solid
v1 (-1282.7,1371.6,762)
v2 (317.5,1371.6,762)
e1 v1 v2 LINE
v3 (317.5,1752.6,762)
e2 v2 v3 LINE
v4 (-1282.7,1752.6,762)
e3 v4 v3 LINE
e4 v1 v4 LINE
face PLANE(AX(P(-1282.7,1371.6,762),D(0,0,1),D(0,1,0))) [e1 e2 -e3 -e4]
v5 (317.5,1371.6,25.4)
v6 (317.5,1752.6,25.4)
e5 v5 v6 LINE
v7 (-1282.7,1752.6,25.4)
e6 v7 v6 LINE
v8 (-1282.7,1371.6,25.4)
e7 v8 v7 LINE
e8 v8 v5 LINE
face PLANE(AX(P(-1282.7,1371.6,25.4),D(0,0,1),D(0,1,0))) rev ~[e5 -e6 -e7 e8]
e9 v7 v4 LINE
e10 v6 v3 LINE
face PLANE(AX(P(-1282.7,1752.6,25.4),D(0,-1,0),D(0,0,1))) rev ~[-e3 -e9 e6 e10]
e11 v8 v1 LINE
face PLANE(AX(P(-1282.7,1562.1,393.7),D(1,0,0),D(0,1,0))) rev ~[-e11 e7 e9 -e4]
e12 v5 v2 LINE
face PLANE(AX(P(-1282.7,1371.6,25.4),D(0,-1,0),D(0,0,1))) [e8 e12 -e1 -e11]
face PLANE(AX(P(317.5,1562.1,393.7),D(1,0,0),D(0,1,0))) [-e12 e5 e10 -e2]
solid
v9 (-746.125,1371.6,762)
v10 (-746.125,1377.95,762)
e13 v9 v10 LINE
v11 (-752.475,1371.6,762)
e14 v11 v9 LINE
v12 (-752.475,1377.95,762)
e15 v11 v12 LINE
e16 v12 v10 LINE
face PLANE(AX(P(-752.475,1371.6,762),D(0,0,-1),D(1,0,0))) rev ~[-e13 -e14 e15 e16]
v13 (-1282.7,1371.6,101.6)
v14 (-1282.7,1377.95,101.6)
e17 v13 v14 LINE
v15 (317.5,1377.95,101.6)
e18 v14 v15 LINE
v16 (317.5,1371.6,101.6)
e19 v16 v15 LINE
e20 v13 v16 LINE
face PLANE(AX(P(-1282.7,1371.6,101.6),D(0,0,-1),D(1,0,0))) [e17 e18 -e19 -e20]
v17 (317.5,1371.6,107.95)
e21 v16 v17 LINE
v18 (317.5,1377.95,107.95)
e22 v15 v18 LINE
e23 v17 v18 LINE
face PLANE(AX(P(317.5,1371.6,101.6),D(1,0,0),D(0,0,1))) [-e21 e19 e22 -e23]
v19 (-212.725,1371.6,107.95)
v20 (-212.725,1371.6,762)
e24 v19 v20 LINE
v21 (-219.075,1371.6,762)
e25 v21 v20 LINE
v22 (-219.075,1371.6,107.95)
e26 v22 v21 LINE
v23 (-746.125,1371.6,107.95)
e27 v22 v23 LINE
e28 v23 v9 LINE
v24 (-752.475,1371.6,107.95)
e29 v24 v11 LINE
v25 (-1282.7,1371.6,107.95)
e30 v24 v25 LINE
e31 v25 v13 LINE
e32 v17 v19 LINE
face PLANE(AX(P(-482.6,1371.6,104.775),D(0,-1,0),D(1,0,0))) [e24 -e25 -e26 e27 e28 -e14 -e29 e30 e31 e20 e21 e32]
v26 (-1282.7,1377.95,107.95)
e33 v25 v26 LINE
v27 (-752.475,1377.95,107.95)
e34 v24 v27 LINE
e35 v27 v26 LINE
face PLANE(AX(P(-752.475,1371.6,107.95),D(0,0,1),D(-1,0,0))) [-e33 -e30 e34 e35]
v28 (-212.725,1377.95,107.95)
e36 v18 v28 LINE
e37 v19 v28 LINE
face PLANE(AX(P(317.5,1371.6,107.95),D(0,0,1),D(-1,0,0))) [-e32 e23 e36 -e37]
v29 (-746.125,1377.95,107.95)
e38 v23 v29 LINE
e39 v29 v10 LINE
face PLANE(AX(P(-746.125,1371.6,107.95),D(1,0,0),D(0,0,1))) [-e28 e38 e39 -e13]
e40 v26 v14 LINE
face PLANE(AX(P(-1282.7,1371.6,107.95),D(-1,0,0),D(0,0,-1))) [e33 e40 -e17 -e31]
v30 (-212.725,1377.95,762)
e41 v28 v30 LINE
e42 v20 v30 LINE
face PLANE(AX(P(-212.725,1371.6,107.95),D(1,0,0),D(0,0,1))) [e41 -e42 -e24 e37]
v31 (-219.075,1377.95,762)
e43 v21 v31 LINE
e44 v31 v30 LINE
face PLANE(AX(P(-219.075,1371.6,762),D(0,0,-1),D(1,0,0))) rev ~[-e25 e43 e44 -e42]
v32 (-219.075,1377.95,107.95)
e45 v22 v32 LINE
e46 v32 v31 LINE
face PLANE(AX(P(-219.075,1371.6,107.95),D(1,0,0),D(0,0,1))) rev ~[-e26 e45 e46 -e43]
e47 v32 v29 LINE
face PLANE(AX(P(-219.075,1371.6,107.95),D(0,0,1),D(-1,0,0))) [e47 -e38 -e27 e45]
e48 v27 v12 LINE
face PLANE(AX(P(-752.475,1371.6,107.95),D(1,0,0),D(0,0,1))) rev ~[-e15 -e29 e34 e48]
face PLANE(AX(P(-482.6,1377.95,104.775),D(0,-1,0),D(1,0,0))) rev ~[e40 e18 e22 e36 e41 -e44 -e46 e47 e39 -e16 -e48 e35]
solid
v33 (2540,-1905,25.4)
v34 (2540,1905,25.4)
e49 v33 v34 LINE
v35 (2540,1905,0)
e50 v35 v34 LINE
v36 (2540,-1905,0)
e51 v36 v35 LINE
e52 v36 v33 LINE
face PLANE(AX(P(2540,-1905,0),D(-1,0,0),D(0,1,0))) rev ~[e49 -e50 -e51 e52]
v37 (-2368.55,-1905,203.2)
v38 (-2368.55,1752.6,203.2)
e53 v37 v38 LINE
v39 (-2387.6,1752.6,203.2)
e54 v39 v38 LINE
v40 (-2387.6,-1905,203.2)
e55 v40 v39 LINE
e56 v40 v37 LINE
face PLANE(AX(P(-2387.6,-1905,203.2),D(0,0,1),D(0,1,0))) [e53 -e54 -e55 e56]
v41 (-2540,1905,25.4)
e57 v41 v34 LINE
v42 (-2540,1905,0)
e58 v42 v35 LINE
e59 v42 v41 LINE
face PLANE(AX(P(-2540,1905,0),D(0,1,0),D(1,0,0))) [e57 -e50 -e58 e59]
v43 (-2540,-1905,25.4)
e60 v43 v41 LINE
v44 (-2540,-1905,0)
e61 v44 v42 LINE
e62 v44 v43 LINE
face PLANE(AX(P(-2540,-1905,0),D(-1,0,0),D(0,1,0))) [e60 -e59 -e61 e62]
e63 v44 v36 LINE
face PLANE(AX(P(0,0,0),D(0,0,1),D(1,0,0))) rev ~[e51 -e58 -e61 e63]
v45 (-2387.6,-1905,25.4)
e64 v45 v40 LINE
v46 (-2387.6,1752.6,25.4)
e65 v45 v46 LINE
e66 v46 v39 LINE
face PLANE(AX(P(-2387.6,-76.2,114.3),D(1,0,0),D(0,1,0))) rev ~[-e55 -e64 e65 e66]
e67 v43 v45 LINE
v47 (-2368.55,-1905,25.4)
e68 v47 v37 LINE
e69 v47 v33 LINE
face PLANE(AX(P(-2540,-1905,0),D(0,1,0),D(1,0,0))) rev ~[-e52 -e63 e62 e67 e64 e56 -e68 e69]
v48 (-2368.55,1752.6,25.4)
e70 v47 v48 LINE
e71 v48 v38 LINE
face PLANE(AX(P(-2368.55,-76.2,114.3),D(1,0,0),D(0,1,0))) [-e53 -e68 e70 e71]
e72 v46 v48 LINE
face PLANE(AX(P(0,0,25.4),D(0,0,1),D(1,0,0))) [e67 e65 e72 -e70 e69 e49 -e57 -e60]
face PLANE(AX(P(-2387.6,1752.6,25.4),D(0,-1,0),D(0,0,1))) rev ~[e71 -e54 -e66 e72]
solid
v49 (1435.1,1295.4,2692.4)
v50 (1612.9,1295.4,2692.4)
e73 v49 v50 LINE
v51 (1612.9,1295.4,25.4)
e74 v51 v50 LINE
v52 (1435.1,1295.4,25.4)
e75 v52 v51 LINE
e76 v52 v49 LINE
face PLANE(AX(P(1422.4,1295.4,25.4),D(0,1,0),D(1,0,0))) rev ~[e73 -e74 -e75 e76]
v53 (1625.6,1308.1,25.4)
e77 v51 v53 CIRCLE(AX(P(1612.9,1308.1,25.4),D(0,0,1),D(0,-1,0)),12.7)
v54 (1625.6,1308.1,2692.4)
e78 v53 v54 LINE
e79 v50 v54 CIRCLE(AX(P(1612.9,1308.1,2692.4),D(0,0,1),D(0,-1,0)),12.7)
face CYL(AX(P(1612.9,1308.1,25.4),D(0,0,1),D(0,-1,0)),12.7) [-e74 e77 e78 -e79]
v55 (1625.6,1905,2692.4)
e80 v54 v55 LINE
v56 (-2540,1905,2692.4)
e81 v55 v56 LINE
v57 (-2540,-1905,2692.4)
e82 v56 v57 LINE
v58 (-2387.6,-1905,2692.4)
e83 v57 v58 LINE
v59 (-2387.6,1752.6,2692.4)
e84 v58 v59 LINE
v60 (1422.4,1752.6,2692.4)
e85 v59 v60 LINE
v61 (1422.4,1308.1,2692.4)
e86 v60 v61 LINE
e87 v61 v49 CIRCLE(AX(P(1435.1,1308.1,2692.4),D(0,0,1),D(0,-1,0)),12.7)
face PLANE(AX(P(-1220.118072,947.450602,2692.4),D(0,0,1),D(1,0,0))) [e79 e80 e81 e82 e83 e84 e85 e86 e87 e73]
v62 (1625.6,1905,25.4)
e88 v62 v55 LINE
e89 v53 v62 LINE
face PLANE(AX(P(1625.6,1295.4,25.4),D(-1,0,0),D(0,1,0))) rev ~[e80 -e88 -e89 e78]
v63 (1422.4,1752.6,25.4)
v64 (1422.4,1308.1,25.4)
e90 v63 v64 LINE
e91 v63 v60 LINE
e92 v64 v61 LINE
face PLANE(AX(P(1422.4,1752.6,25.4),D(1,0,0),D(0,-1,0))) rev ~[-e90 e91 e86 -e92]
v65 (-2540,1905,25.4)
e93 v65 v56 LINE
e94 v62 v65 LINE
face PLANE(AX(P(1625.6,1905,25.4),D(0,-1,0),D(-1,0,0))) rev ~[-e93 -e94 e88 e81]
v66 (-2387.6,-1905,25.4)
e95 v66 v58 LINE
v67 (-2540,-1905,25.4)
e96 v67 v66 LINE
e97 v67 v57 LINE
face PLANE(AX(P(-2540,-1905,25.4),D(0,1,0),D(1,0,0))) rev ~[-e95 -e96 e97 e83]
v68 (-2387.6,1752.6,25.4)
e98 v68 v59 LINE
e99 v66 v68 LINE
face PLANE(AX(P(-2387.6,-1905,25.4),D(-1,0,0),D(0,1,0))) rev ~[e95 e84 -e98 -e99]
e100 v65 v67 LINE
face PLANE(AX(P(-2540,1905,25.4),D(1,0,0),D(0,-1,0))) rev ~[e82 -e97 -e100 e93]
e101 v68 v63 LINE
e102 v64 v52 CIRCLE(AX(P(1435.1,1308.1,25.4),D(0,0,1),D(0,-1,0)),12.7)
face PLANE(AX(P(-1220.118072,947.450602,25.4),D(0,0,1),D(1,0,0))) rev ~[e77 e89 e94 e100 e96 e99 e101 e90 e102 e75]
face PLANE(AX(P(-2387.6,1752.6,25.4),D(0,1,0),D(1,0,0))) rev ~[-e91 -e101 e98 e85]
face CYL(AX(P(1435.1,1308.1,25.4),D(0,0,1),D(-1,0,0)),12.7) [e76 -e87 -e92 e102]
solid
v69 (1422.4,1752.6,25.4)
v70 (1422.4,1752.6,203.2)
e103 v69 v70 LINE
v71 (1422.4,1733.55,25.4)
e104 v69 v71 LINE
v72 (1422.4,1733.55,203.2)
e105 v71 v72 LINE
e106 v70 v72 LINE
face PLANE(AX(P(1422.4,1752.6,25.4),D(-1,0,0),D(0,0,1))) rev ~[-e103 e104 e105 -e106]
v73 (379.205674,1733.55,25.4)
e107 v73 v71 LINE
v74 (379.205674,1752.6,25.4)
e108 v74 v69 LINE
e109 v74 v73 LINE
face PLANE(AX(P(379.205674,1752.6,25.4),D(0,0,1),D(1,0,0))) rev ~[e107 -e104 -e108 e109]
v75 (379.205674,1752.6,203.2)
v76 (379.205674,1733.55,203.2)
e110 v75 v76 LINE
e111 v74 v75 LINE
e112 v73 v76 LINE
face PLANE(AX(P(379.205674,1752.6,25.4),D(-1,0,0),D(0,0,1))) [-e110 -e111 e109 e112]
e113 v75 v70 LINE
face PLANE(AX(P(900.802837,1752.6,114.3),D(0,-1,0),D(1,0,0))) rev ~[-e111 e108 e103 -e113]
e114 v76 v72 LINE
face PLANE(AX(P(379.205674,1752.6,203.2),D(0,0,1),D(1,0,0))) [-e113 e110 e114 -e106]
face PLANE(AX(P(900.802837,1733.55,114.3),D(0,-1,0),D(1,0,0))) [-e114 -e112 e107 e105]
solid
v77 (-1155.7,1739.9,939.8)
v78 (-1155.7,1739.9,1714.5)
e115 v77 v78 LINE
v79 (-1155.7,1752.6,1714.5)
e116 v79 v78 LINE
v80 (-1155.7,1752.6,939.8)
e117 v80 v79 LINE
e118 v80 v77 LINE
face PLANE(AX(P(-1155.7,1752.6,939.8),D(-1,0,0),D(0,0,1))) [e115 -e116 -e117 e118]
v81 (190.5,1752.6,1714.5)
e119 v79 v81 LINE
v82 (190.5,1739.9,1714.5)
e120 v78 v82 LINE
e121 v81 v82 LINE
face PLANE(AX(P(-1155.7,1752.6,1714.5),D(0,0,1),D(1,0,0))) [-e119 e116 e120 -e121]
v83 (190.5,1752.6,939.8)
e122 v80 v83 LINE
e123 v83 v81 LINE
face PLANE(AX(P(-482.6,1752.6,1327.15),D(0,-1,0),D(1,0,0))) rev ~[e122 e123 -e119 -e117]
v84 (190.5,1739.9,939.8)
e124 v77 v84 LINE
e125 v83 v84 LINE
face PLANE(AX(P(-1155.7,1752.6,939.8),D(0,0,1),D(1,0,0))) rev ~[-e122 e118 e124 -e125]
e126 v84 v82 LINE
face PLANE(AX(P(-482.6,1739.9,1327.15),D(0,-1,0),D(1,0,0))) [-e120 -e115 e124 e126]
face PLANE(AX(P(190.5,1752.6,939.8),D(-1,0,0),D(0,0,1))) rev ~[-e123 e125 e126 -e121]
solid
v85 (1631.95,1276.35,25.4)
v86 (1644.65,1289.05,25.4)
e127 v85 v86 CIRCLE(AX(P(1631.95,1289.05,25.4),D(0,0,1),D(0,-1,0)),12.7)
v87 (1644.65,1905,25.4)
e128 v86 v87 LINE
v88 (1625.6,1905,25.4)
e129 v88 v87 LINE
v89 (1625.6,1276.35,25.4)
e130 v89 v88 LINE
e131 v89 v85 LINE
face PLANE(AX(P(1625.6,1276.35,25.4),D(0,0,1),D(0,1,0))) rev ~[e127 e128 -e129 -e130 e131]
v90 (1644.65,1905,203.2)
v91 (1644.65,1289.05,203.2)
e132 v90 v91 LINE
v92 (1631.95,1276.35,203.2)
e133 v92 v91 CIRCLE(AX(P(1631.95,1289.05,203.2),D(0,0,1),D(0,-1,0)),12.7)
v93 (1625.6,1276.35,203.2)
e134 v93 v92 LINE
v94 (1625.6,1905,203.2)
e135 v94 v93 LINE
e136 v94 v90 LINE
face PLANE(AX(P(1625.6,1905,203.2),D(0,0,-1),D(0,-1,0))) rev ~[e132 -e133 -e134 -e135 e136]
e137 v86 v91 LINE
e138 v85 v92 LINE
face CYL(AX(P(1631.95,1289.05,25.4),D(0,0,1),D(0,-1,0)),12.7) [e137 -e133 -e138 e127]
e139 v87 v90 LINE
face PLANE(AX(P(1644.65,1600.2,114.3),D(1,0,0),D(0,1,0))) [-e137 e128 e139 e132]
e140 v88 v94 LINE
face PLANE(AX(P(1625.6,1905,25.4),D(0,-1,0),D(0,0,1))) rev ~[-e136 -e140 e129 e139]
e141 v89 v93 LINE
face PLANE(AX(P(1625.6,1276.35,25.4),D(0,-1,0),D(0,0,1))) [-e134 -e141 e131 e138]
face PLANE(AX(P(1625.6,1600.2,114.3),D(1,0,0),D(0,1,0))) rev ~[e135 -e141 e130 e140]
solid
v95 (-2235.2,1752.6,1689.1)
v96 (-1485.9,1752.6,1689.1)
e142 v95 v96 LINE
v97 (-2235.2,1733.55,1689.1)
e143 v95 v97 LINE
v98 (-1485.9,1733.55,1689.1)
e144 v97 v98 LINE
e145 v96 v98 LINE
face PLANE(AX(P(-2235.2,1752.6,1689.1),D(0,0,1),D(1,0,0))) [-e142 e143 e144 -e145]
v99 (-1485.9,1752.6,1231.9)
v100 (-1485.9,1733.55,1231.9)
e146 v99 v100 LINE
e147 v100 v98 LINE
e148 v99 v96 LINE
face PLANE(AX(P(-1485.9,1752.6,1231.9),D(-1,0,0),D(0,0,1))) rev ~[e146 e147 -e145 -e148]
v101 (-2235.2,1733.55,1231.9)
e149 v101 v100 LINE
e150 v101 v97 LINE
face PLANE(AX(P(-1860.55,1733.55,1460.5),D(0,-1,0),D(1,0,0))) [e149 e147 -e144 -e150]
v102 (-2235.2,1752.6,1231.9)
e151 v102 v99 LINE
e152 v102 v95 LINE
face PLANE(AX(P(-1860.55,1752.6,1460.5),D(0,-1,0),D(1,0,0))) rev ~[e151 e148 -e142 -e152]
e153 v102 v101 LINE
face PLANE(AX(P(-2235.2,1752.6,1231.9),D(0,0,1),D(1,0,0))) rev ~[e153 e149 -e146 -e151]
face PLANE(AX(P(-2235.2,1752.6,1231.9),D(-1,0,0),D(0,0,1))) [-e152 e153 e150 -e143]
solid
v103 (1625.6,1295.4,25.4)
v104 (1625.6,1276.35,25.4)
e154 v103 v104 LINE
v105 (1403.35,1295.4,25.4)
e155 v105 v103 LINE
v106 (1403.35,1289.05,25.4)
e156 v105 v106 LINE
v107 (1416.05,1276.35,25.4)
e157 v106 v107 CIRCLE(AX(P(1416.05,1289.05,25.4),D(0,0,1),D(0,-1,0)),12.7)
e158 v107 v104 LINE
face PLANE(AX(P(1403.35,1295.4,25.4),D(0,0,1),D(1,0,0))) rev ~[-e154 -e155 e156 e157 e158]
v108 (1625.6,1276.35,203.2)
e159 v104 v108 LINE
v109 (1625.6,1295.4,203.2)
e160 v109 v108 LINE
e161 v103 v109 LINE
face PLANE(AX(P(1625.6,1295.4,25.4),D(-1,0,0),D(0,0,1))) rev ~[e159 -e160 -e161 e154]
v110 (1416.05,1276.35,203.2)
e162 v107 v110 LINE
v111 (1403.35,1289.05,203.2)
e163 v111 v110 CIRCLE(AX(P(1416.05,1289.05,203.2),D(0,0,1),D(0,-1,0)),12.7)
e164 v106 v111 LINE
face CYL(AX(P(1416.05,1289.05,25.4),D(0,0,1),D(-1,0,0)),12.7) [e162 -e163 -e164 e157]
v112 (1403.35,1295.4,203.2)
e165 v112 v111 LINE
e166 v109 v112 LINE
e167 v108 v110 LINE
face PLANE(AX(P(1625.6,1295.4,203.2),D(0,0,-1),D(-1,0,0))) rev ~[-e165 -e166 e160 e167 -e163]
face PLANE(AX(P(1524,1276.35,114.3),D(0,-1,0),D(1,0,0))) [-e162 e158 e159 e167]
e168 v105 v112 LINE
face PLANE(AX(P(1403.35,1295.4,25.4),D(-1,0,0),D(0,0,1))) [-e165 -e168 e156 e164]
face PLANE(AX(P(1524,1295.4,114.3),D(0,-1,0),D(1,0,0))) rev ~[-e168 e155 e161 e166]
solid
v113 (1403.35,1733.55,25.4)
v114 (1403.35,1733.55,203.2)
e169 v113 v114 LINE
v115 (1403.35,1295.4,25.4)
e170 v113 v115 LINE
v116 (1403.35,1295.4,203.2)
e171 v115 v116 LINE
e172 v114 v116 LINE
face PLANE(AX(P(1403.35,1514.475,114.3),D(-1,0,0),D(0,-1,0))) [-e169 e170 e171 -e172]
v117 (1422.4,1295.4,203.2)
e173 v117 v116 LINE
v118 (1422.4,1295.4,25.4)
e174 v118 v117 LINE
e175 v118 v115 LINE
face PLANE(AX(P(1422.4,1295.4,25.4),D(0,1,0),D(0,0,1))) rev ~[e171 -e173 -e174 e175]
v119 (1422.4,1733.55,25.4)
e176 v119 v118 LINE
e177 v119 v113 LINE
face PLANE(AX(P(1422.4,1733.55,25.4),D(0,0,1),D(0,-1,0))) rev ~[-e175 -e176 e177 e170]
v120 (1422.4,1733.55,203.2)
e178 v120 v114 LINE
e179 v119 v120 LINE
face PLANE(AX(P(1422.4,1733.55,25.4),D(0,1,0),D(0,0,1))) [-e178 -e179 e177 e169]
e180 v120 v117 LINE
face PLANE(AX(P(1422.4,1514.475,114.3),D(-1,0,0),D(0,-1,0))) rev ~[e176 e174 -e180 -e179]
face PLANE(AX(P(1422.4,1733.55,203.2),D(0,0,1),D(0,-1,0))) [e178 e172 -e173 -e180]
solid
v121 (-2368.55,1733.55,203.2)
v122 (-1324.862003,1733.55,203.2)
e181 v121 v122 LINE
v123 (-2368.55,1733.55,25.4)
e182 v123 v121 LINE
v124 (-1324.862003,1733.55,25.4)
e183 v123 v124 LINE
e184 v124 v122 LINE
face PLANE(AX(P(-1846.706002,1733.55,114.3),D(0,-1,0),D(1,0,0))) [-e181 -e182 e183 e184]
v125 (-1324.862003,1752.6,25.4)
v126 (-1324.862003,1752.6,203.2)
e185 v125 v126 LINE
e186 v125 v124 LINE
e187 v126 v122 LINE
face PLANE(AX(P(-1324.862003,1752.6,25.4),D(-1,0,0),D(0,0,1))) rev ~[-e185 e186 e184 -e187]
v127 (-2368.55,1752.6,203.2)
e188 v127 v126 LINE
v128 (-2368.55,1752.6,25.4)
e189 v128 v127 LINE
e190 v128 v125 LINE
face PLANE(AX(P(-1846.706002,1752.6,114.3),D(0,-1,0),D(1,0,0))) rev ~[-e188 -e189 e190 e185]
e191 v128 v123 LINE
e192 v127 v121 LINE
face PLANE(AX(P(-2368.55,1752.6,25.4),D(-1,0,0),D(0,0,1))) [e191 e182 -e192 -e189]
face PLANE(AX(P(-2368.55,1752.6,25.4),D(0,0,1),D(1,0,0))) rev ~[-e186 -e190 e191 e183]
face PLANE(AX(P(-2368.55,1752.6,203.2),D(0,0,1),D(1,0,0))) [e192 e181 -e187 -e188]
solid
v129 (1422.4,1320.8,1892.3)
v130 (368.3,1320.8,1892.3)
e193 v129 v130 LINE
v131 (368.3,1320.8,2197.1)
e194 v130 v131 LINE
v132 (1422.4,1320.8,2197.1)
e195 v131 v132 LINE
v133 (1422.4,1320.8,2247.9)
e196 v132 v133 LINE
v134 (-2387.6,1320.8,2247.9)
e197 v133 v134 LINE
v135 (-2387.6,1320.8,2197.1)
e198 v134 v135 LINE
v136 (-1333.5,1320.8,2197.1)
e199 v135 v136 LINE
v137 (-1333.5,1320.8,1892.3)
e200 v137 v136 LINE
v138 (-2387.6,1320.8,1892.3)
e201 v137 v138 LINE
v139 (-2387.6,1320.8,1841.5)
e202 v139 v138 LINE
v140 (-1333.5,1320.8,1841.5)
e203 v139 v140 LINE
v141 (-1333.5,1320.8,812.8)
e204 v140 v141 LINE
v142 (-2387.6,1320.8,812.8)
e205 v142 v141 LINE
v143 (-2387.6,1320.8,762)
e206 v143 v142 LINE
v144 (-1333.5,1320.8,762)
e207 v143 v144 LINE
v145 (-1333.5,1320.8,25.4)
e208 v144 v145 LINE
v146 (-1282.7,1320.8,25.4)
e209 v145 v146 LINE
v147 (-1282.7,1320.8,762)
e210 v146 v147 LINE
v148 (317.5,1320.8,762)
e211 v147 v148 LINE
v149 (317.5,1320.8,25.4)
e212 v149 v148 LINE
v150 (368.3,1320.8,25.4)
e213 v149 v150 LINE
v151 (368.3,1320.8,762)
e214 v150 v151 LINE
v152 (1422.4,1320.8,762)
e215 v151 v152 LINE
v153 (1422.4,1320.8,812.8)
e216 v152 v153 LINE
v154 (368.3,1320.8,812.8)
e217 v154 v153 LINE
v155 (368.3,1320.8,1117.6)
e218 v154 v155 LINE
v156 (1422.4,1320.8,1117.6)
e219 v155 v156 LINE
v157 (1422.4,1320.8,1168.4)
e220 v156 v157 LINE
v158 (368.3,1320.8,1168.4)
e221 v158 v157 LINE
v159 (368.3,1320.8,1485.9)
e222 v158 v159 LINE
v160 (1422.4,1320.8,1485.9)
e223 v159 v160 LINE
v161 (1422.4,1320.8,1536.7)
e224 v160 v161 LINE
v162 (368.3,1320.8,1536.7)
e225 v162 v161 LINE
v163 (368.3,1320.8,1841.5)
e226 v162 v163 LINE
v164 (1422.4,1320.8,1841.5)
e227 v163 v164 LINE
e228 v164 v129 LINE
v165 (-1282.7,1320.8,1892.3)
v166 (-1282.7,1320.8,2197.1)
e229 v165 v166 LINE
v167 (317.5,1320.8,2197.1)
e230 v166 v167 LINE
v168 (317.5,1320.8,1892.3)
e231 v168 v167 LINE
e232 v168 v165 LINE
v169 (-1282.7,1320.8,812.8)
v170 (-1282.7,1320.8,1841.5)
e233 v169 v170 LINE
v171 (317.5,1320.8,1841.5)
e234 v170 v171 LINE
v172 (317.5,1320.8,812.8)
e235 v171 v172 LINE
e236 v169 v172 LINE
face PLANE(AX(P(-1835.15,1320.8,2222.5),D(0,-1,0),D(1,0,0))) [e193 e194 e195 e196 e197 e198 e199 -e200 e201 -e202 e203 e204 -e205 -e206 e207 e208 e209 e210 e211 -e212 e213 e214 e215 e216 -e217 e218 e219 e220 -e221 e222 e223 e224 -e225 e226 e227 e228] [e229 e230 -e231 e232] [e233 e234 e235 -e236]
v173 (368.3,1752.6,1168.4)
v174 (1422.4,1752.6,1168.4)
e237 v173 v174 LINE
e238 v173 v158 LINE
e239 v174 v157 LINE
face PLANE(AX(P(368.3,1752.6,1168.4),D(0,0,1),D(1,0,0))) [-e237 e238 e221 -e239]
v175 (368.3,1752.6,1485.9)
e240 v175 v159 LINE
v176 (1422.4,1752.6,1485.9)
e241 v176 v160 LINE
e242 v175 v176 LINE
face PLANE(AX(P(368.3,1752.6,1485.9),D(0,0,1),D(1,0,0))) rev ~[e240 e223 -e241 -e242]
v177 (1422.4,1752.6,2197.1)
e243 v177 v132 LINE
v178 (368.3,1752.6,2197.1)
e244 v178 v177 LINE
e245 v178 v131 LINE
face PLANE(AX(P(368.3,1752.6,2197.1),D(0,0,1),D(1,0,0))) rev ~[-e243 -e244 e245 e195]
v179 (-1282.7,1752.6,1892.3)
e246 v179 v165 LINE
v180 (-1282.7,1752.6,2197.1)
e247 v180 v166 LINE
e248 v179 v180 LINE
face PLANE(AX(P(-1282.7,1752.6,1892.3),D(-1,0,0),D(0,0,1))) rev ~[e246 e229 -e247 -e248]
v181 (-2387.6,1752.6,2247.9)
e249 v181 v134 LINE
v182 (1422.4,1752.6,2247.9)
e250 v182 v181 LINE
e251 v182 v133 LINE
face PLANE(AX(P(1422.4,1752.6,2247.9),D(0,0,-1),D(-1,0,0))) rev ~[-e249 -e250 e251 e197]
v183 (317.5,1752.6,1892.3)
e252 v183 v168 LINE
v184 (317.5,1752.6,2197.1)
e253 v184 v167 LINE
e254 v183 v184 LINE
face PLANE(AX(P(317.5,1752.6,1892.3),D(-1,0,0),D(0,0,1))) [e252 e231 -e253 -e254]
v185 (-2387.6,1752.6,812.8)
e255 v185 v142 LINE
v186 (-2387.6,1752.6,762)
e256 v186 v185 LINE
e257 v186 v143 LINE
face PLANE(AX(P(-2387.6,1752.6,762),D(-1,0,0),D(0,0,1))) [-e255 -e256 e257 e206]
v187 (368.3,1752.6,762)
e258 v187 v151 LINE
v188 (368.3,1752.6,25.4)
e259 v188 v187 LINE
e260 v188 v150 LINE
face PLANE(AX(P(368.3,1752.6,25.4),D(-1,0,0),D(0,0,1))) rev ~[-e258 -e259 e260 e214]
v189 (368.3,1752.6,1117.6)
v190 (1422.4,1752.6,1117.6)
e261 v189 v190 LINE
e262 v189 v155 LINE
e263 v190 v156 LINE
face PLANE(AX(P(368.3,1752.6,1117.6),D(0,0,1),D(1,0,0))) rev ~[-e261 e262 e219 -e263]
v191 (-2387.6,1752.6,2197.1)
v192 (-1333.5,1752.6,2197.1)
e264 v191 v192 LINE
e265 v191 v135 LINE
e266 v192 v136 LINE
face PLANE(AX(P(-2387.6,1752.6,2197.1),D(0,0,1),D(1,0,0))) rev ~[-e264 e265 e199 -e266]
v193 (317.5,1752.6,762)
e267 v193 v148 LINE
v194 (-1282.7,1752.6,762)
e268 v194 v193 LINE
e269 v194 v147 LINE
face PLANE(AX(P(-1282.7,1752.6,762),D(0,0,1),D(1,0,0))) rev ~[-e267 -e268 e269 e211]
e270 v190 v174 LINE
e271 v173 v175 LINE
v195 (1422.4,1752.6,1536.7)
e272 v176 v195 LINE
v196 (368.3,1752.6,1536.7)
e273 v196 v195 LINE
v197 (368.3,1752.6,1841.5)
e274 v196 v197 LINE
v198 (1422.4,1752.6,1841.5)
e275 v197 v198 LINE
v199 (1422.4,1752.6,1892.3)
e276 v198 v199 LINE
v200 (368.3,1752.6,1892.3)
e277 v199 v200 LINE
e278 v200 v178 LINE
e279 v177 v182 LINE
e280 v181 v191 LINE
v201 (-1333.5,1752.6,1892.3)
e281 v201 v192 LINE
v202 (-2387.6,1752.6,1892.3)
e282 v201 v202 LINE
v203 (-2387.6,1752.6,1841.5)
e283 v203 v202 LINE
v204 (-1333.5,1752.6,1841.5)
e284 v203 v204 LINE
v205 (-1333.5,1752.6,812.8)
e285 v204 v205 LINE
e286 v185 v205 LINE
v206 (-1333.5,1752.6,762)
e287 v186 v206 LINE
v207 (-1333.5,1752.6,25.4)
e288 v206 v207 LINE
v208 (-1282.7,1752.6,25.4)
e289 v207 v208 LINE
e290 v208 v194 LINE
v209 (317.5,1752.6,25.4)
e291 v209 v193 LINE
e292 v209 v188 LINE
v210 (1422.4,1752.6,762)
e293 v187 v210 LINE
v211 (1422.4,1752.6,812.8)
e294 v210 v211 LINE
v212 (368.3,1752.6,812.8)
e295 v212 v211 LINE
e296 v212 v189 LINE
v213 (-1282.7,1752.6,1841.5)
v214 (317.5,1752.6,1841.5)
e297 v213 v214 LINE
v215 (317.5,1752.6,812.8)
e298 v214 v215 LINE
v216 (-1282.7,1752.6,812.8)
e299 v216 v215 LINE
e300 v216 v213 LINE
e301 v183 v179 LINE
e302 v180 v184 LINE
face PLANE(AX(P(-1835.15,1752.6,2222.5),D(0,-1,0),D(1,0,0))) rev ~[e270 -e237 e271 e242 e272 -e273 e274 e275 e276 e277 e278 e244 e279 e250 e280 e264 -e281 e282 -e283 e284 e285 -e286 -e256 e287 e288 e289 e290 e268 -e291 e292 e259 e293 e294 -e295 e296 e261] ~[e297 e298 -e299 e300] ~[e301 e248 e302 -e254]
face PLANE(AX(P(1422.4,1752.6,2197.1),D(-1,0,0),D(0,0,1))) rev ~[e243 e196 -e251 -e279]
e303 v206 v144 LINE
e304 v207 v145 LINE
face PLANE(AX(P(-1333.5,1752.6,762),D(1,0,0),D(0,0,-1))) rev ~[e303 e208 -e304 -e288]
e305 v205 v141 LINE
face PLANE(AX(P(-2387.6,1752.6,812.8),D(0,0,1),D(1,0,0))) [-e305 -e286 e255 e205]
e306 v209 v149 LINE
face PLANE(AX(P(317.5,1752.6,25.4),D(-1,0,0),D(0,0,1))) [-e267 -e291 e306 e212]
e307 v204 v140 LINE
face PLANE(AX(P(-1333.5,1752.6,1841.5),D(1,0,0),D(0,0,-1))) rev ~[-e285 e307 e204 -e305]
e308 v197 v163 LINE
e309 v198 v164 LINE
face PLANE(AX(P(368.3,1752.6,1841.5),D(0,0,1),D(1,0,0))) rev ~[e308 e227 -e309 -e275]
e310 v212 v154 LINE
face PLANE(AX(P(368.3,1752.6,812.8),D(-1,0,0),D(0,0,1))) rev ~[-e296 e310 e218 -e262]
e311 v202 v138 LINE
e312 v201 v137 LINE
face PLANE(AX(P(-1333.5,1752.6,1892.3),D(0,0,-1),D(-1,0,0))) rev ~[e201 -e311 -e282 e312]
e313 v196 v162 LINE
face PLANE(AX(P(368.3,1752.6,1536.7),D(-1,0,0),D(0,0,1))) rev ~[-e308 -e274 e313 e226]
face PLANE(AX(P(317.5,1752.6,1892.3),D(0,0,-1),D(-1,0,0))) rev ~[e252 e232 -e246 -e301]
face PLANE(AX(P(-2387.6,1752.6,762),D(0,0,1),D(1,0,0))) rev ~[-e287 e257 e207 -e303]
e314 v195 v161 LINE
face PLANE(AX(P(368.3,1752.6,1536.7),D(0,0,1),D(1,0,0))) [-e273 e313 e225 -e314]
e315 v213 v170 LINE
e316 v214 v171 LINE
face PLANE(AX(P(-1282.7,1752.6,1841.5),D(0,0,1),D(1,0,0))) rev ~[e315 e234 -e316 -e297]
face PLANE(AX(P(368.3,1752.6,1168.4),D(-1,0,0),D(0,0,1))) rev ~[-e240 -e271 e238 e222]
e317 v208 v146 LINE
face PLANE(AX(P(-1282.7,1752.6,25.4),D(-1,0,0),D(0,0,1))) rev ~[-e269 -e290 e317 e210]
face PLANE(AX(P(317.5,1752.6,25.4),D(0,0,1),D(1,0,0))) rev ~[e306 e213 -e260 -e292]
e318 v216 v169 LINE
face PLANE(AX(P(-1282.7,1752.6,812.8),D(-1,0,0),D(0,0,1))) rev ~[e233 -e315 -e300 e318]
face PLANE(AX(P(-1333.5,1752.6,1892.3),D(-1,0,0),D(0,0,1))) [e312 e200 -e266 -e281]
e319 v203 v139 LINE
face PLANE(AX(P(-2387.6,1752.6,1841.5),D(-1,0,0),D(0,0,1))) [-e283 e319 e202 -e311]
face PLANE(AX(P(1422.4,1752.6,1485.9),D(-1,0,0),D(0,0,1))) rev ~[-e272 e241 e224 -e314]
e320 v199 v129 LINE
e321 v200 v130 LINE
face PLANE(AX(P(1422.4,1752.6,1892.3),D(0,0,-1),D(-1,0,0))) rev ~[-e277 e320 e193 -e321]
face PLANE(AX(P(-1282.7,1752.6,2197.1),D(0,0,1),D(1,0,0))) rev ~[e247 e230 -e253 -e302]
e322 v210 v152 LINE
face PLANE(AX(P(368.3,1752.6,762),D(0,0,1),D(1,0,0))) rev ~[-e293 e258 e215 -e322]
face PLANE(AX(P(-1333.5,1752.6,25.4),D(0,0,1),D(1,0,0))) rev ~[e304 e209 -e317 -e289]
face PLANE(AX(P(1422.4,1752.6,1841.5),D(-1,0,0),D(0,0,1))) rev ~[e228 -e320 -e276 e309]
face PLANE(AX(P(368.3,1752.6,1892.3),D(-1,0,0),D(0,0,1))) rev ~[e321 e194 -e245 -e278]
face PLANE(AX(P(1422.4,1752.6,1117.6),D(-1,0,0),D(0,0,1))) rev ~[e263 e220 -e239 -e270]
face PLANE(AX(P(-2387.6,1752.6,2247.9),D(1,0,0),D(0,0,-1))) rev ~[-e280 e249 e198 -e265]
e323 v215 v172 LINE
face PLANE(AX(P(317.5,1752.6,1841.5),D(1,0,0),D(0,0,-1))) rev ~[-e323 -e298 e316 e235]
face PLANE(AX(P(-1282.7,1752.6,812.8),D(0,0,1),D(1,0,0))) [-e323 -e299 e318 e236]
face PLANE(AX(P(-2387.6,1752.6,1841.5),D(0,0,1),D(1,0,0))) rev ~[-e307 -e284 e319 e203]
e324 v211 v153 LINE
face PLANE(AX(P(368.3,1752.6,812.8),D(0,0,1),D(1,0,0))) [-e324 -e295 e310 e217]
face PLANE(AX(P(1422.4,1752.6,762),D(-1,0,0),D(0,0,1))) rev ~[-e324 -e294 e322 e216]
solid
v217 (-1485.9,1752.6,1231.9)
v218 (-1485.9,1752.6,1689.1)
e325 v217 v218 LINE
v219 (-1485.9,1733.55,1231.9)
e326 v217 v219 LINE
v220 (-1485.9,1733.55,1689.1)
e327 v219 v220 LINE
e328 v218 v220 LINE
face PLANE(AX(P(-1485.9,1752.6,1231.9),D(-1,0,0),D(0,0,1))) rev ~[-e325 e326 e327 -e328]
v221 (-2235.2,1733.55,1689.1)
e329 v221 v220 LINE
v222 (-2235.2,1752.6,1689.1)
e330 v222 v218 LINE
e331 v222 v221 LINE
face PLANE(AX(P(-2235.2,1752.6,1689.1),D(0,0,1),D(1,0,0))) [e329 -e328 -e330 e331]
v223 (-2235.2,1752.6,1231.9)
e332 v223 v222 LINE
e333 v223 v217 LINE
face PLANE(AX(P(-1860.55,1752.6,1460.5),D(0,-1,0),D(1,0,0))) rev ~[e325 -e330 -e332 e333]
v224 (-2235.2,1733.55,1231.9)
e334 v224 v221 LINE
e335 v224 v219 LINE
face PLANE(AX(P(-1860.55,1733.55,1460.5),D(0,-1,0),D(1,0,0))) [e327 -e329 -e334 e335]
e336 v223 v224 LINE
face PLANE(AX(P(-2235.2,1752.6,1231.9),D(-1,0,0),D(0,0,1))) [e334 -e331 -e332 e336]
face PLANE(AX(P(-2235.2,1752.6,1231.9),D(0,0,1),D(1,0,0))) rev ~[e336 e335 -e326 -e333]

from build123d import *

# Parameters (mm, degrees)
F0_W      = 5080
F0_H      = 3810
F1_DEPTH  = 25.4
F3_DEPTH  = 2667
F4_W      = 3657.6
F4_H      = 177.8
F5_DEPTH  = 19.05
F7_W      = 438.15
F7_H      = 177.8
F8_DEPTH  = 19.05
F9_W      = 203.2
F9_H      = 177.8
F9_W_2    = 19.05
F10_DEPTH = 19.05
F11_W     = 609.6
F11_H     = 177.8
F11_W_2   = 19.05
F12_DEPTH = 19.05
F13_W     = 1346.2
F13_H     = 774.7
F14_DEPTH = 12.7
F15_W     = 1054.1
F15_H     = 50.8
F15_W_2   = 50.8
F15_W_3   = 1600.2
F15_H_2   = 1028.7
F15_H_3   = 736.6
F15_H_4   = 304.8
F16_DEPTH = 431.8
F17_W     = 381
F17_H     = 736.6
F18_DEPTH = 1600.2
F20_W     = 749.3
F20_H     = 457.2
F21_DEPTH = 19.05
F22_DEPTH = 19.05
F23_R     = 12.7
F23_2_R   = 12.7
F23_3_R   = 12.7
F24_W     = 1043.194326067
F24_H     = 177.8
F25_DEPTH = 19.05
F26_W     = 1043.6879966736
F26_H     = 177.8
F27_DEPTH = 19.05
F19_W     = 6.35
F19_H     = 654.05
F28_DEPTH = 6.35


# Not quite as in the source:
# - a feature names something its author has since deleted; it is built from what else it names


with BuildPart() as f1:
    # F0 (on Top) → F1 (new body)
    with BuildSketch(Plane.XY):
        Rectangle(F0_W, F0_H)
    extrude(amount=F1_DEPTH)

    # F4 (on face) → F5 (join)
    with BuildSketch(Plane.YZ.offset(-2387.6)):
        with Locations((-76.2, 114.3)):
            Rectangle(F4_W, F4_H)
    extrude(amount=F5_DEPTH)


with BuildPart() as f3:
    # F2 (on face) → F3 (new body)
    with BuildSketch(Plane.XY.offset(25.4)):
        Polygon((-2540, -1905), (-2387.6, -1905), (-2387.6, 1752.6), (1422.4, 1752.6), (1422.4, 1295.4), (1625.6, 1295.4), (1625.6, 1905), (-2540, 1905), align=None)
    extrude(amount=F3_DEPTH)

    # F23
    f23_edges = [f3.edges().sort_by_distance(p)[0] for p in [
        (1422.4, 1295.4, 1358.9),
        (1625.6, 1295.4, 1358.9),
    ]]
    fillet(f23_edges, radius=F23_R)


with BuildPart() as f8:
    # F7 (on face) → F8 (new body)
    with BuildSketch(Plane(origin=(1422.4, 0, 0), x_dir=(0, -1, 0), z_dir=(-1, 0, 0))):
        with Locations((-1514.475, 114.3)):
            Rectangle(F7_W, F7_H)
    extrude(amount=F8_DEPTH)


with BuildPart() as f10:
    # F9 (on face) → F10 (new body)
    with BuildSketch(Plane.XZ.offset(-1295.4)):
        with Locations((1524, 114.3)):
            Rectangle(F9_W, F9_H)
        with Locations((1412.875, 114.3)):
            Rectangle(F9_W_2, F9_H)
    extrude(amount=F10_DEPTH)

    # F23#2
    f23_2_edges = [f10.edges().sort_by_distance(p)[0] for p in [
        (1403.35, 1276.35, 114.3),
    ]]
    fillet(f23_2_edges, radius=F23_2_R)


with BuildPart() as f12:
    # F11 (on face) → F12 (new body)
    with BuildSketch(Plane.YZ.offset(1625.6)):
        with Locations((1600.2, 114.3)):
            Rectangle(F11_W, F11_H)
        with Locations((1285.875, 114.3)):
            Rectangle(F11_W_2, F11_H)
    extrude(amount=F12_DEPTH)

    # F23#3
    f23_3_edges = [f12.edges().sort_by_distance(p)[0] for p in [
        (1644.65, 1276.35, 114.3),
    ]]
    fillet(f23_3_edges, radius=F23_3_R)


with BuildPart() as f14:
    # F13 (on face) → F14 (new body)
    with BuildSketch(Plane.XZ.offset(-1752.6)):
        with Locations((-482.6, 1327.15)):
            Rectangle(F13_W, F13_H)
    extrude(amount=F14_DEPTH)


with BuildPart() as f16:
    # F15 (on face) → F16 (new body)
    with BuildSketch(Plane.XZ.offset(-1752.6)):
        Polygon((-2387.6, 2247.9), (-2387.6, 2197.1), (-1333.5, 2197.1), (-1282.7, 2197.1), (-1282.7, 2247.9), align=None)
        Polygon((-1282.7, 2247.9), (-1282.7, 2197.1), (317.5, 2197.1), (368.3, 2197.1), (1422.4, 2197.1), (1422.4, 2247.9), align=None)
        with Locations((-1860.55, 1866.9)):
            Rectangle(F15_W, F15_H)
        with Locations((-1308.1, 1866.9)):
            Rectangle(F15_W_2, F15_H)
        with Locations((-482.6, 1866.9)):
            Rectangle(F15_W_3, F15_H)
        with Locations((342.9, 1866.9)):
            Rectangle(F15_W_2, F15_H)
        with Locations((895.35, 1866.9)):
            Rectangle(F15_W, F15_H)
        with Locations((-1308.1, 1327.15)):
            Rectangle(F15_W_2, F15_H_2)
        Polygon((368.3, 1841.5), (317.5, 1841.5), (317.5, 812.8), (368.3, 812.8), (368.3, 1117.6), (368.3, 1168.4), (368.3, 1485.9), (368.3, 1536.7), align=None)
        with Locations((895.35, 787.4)):
            Rectangle(F15_W, F15_H)
        with Locations((342.9, 787.4)):
            Rectangle(F15_W_2, F15_H)
        with Locations((-482.6, 787.4)):
            Rectangle(F15_W_3, F15_H)
        with Locations((342.9, 393.7)):
            Rectangle(F15_W_2, F15_H_3)
        with Locations((-1308.1, 787.4)):
            Rectangle(F15_W_2, F15_H)
        with Locations((-1308.1, 393.7)):
            Rectangle(F15_W_2, F15_H_3)
        with Locations((-1860.55, 787.4)):
            Rectangle(F15_W, F15_H)
        with Locations((895.35, 1143)):
            Rectangle(F15_W, F15_H)
        with Locations((895.35, 1511.3)):
            Rectangle(F15_W, F15_H)
        with Locations((342.9, 2044.7)):
            Rectangle(F15_W_2, F15_H_4)
        with Locations((-1308.1, 2044.7)):
            Rectangle(F15_W_2, F15_H_4)
    extrude(amount=F16_DEPTH)


with BuildPart() as f18:
    # F17 (on face) → F18 (new body, through all)
    with BuildSketch(Plane.YZ.offset(-1282.7)):
        with Locations((1562.1, 393.7)):
            Rectangle(F17_W, F17_H)
    extrude(amount=F18_DEPTH)


with BuildPart() as f21:
    # F20 (on face) → F21 (new body)
    with BuildSketch(Plane.XZ.offset(-1752.6)):
        with Locations((-1860.55, 1460.5)):
            Rectangle(F20_W, F20_H)
    extrude(amount=F21_DEPTH)


with BuildPart() as f22:
    # F20 (on face) → F22 (new body)
    with BuildSketch(Plane.XZ.offset(-1752.6)):
        with Locations((-1860.55, 1460.5)):
            Rectangle(F20_W, F20_H)
    extrude(amount=F22_DEPTH)


with BuildPart() as f25:
    # F24 (on face) → F25 (new body)
    with BuildSketch(Plane.XZ.offset(-1752.6)):
        with Locations((900.8028369665, 114.3)):
            Rectangle(F24_W, F24_H)
    extrude(amount=F25_DEPTH)


with BuildPart() as f27:
    # F26 (on face) → F27 (new body)
    with BuildSketch(Plane.XZ.offset(-1752.6)):
        with Locations((-1846.7060016632, 114.3)):
            Rectangle(F26_W, F26_H)
    extrude(amount=F27_DEPTH)


with BuildPart() as f28:
    # F19 (on face) → F28 (new body)
    with BuildSketch(Plane.XZ.offset(-1371.6)):
        Polygon((-1282.7, 107.95), (-1282.7, 101.6), (317.5, 101.6), (317.5, 107.95), (-212.725, 107.95), (-219.075, 107.95), (-746.125, 107.95), (-752.475, 107.95), align=None)
        with Locations((-215.9, 434.975)):
            Rectangle(F19_W, F19_H)
        with Locations((-749.3, 434.975)):
            Rectangle(F19_W, F19_H)
    extrude(amount=-F28_DEPTH)


solid = Compound([f1.part, f3.part, f8.part, f10.part, f12.part, f14.part, f16.part, f18.part, f21.part, f22.part, f25.part, f27.part, f28.part])
